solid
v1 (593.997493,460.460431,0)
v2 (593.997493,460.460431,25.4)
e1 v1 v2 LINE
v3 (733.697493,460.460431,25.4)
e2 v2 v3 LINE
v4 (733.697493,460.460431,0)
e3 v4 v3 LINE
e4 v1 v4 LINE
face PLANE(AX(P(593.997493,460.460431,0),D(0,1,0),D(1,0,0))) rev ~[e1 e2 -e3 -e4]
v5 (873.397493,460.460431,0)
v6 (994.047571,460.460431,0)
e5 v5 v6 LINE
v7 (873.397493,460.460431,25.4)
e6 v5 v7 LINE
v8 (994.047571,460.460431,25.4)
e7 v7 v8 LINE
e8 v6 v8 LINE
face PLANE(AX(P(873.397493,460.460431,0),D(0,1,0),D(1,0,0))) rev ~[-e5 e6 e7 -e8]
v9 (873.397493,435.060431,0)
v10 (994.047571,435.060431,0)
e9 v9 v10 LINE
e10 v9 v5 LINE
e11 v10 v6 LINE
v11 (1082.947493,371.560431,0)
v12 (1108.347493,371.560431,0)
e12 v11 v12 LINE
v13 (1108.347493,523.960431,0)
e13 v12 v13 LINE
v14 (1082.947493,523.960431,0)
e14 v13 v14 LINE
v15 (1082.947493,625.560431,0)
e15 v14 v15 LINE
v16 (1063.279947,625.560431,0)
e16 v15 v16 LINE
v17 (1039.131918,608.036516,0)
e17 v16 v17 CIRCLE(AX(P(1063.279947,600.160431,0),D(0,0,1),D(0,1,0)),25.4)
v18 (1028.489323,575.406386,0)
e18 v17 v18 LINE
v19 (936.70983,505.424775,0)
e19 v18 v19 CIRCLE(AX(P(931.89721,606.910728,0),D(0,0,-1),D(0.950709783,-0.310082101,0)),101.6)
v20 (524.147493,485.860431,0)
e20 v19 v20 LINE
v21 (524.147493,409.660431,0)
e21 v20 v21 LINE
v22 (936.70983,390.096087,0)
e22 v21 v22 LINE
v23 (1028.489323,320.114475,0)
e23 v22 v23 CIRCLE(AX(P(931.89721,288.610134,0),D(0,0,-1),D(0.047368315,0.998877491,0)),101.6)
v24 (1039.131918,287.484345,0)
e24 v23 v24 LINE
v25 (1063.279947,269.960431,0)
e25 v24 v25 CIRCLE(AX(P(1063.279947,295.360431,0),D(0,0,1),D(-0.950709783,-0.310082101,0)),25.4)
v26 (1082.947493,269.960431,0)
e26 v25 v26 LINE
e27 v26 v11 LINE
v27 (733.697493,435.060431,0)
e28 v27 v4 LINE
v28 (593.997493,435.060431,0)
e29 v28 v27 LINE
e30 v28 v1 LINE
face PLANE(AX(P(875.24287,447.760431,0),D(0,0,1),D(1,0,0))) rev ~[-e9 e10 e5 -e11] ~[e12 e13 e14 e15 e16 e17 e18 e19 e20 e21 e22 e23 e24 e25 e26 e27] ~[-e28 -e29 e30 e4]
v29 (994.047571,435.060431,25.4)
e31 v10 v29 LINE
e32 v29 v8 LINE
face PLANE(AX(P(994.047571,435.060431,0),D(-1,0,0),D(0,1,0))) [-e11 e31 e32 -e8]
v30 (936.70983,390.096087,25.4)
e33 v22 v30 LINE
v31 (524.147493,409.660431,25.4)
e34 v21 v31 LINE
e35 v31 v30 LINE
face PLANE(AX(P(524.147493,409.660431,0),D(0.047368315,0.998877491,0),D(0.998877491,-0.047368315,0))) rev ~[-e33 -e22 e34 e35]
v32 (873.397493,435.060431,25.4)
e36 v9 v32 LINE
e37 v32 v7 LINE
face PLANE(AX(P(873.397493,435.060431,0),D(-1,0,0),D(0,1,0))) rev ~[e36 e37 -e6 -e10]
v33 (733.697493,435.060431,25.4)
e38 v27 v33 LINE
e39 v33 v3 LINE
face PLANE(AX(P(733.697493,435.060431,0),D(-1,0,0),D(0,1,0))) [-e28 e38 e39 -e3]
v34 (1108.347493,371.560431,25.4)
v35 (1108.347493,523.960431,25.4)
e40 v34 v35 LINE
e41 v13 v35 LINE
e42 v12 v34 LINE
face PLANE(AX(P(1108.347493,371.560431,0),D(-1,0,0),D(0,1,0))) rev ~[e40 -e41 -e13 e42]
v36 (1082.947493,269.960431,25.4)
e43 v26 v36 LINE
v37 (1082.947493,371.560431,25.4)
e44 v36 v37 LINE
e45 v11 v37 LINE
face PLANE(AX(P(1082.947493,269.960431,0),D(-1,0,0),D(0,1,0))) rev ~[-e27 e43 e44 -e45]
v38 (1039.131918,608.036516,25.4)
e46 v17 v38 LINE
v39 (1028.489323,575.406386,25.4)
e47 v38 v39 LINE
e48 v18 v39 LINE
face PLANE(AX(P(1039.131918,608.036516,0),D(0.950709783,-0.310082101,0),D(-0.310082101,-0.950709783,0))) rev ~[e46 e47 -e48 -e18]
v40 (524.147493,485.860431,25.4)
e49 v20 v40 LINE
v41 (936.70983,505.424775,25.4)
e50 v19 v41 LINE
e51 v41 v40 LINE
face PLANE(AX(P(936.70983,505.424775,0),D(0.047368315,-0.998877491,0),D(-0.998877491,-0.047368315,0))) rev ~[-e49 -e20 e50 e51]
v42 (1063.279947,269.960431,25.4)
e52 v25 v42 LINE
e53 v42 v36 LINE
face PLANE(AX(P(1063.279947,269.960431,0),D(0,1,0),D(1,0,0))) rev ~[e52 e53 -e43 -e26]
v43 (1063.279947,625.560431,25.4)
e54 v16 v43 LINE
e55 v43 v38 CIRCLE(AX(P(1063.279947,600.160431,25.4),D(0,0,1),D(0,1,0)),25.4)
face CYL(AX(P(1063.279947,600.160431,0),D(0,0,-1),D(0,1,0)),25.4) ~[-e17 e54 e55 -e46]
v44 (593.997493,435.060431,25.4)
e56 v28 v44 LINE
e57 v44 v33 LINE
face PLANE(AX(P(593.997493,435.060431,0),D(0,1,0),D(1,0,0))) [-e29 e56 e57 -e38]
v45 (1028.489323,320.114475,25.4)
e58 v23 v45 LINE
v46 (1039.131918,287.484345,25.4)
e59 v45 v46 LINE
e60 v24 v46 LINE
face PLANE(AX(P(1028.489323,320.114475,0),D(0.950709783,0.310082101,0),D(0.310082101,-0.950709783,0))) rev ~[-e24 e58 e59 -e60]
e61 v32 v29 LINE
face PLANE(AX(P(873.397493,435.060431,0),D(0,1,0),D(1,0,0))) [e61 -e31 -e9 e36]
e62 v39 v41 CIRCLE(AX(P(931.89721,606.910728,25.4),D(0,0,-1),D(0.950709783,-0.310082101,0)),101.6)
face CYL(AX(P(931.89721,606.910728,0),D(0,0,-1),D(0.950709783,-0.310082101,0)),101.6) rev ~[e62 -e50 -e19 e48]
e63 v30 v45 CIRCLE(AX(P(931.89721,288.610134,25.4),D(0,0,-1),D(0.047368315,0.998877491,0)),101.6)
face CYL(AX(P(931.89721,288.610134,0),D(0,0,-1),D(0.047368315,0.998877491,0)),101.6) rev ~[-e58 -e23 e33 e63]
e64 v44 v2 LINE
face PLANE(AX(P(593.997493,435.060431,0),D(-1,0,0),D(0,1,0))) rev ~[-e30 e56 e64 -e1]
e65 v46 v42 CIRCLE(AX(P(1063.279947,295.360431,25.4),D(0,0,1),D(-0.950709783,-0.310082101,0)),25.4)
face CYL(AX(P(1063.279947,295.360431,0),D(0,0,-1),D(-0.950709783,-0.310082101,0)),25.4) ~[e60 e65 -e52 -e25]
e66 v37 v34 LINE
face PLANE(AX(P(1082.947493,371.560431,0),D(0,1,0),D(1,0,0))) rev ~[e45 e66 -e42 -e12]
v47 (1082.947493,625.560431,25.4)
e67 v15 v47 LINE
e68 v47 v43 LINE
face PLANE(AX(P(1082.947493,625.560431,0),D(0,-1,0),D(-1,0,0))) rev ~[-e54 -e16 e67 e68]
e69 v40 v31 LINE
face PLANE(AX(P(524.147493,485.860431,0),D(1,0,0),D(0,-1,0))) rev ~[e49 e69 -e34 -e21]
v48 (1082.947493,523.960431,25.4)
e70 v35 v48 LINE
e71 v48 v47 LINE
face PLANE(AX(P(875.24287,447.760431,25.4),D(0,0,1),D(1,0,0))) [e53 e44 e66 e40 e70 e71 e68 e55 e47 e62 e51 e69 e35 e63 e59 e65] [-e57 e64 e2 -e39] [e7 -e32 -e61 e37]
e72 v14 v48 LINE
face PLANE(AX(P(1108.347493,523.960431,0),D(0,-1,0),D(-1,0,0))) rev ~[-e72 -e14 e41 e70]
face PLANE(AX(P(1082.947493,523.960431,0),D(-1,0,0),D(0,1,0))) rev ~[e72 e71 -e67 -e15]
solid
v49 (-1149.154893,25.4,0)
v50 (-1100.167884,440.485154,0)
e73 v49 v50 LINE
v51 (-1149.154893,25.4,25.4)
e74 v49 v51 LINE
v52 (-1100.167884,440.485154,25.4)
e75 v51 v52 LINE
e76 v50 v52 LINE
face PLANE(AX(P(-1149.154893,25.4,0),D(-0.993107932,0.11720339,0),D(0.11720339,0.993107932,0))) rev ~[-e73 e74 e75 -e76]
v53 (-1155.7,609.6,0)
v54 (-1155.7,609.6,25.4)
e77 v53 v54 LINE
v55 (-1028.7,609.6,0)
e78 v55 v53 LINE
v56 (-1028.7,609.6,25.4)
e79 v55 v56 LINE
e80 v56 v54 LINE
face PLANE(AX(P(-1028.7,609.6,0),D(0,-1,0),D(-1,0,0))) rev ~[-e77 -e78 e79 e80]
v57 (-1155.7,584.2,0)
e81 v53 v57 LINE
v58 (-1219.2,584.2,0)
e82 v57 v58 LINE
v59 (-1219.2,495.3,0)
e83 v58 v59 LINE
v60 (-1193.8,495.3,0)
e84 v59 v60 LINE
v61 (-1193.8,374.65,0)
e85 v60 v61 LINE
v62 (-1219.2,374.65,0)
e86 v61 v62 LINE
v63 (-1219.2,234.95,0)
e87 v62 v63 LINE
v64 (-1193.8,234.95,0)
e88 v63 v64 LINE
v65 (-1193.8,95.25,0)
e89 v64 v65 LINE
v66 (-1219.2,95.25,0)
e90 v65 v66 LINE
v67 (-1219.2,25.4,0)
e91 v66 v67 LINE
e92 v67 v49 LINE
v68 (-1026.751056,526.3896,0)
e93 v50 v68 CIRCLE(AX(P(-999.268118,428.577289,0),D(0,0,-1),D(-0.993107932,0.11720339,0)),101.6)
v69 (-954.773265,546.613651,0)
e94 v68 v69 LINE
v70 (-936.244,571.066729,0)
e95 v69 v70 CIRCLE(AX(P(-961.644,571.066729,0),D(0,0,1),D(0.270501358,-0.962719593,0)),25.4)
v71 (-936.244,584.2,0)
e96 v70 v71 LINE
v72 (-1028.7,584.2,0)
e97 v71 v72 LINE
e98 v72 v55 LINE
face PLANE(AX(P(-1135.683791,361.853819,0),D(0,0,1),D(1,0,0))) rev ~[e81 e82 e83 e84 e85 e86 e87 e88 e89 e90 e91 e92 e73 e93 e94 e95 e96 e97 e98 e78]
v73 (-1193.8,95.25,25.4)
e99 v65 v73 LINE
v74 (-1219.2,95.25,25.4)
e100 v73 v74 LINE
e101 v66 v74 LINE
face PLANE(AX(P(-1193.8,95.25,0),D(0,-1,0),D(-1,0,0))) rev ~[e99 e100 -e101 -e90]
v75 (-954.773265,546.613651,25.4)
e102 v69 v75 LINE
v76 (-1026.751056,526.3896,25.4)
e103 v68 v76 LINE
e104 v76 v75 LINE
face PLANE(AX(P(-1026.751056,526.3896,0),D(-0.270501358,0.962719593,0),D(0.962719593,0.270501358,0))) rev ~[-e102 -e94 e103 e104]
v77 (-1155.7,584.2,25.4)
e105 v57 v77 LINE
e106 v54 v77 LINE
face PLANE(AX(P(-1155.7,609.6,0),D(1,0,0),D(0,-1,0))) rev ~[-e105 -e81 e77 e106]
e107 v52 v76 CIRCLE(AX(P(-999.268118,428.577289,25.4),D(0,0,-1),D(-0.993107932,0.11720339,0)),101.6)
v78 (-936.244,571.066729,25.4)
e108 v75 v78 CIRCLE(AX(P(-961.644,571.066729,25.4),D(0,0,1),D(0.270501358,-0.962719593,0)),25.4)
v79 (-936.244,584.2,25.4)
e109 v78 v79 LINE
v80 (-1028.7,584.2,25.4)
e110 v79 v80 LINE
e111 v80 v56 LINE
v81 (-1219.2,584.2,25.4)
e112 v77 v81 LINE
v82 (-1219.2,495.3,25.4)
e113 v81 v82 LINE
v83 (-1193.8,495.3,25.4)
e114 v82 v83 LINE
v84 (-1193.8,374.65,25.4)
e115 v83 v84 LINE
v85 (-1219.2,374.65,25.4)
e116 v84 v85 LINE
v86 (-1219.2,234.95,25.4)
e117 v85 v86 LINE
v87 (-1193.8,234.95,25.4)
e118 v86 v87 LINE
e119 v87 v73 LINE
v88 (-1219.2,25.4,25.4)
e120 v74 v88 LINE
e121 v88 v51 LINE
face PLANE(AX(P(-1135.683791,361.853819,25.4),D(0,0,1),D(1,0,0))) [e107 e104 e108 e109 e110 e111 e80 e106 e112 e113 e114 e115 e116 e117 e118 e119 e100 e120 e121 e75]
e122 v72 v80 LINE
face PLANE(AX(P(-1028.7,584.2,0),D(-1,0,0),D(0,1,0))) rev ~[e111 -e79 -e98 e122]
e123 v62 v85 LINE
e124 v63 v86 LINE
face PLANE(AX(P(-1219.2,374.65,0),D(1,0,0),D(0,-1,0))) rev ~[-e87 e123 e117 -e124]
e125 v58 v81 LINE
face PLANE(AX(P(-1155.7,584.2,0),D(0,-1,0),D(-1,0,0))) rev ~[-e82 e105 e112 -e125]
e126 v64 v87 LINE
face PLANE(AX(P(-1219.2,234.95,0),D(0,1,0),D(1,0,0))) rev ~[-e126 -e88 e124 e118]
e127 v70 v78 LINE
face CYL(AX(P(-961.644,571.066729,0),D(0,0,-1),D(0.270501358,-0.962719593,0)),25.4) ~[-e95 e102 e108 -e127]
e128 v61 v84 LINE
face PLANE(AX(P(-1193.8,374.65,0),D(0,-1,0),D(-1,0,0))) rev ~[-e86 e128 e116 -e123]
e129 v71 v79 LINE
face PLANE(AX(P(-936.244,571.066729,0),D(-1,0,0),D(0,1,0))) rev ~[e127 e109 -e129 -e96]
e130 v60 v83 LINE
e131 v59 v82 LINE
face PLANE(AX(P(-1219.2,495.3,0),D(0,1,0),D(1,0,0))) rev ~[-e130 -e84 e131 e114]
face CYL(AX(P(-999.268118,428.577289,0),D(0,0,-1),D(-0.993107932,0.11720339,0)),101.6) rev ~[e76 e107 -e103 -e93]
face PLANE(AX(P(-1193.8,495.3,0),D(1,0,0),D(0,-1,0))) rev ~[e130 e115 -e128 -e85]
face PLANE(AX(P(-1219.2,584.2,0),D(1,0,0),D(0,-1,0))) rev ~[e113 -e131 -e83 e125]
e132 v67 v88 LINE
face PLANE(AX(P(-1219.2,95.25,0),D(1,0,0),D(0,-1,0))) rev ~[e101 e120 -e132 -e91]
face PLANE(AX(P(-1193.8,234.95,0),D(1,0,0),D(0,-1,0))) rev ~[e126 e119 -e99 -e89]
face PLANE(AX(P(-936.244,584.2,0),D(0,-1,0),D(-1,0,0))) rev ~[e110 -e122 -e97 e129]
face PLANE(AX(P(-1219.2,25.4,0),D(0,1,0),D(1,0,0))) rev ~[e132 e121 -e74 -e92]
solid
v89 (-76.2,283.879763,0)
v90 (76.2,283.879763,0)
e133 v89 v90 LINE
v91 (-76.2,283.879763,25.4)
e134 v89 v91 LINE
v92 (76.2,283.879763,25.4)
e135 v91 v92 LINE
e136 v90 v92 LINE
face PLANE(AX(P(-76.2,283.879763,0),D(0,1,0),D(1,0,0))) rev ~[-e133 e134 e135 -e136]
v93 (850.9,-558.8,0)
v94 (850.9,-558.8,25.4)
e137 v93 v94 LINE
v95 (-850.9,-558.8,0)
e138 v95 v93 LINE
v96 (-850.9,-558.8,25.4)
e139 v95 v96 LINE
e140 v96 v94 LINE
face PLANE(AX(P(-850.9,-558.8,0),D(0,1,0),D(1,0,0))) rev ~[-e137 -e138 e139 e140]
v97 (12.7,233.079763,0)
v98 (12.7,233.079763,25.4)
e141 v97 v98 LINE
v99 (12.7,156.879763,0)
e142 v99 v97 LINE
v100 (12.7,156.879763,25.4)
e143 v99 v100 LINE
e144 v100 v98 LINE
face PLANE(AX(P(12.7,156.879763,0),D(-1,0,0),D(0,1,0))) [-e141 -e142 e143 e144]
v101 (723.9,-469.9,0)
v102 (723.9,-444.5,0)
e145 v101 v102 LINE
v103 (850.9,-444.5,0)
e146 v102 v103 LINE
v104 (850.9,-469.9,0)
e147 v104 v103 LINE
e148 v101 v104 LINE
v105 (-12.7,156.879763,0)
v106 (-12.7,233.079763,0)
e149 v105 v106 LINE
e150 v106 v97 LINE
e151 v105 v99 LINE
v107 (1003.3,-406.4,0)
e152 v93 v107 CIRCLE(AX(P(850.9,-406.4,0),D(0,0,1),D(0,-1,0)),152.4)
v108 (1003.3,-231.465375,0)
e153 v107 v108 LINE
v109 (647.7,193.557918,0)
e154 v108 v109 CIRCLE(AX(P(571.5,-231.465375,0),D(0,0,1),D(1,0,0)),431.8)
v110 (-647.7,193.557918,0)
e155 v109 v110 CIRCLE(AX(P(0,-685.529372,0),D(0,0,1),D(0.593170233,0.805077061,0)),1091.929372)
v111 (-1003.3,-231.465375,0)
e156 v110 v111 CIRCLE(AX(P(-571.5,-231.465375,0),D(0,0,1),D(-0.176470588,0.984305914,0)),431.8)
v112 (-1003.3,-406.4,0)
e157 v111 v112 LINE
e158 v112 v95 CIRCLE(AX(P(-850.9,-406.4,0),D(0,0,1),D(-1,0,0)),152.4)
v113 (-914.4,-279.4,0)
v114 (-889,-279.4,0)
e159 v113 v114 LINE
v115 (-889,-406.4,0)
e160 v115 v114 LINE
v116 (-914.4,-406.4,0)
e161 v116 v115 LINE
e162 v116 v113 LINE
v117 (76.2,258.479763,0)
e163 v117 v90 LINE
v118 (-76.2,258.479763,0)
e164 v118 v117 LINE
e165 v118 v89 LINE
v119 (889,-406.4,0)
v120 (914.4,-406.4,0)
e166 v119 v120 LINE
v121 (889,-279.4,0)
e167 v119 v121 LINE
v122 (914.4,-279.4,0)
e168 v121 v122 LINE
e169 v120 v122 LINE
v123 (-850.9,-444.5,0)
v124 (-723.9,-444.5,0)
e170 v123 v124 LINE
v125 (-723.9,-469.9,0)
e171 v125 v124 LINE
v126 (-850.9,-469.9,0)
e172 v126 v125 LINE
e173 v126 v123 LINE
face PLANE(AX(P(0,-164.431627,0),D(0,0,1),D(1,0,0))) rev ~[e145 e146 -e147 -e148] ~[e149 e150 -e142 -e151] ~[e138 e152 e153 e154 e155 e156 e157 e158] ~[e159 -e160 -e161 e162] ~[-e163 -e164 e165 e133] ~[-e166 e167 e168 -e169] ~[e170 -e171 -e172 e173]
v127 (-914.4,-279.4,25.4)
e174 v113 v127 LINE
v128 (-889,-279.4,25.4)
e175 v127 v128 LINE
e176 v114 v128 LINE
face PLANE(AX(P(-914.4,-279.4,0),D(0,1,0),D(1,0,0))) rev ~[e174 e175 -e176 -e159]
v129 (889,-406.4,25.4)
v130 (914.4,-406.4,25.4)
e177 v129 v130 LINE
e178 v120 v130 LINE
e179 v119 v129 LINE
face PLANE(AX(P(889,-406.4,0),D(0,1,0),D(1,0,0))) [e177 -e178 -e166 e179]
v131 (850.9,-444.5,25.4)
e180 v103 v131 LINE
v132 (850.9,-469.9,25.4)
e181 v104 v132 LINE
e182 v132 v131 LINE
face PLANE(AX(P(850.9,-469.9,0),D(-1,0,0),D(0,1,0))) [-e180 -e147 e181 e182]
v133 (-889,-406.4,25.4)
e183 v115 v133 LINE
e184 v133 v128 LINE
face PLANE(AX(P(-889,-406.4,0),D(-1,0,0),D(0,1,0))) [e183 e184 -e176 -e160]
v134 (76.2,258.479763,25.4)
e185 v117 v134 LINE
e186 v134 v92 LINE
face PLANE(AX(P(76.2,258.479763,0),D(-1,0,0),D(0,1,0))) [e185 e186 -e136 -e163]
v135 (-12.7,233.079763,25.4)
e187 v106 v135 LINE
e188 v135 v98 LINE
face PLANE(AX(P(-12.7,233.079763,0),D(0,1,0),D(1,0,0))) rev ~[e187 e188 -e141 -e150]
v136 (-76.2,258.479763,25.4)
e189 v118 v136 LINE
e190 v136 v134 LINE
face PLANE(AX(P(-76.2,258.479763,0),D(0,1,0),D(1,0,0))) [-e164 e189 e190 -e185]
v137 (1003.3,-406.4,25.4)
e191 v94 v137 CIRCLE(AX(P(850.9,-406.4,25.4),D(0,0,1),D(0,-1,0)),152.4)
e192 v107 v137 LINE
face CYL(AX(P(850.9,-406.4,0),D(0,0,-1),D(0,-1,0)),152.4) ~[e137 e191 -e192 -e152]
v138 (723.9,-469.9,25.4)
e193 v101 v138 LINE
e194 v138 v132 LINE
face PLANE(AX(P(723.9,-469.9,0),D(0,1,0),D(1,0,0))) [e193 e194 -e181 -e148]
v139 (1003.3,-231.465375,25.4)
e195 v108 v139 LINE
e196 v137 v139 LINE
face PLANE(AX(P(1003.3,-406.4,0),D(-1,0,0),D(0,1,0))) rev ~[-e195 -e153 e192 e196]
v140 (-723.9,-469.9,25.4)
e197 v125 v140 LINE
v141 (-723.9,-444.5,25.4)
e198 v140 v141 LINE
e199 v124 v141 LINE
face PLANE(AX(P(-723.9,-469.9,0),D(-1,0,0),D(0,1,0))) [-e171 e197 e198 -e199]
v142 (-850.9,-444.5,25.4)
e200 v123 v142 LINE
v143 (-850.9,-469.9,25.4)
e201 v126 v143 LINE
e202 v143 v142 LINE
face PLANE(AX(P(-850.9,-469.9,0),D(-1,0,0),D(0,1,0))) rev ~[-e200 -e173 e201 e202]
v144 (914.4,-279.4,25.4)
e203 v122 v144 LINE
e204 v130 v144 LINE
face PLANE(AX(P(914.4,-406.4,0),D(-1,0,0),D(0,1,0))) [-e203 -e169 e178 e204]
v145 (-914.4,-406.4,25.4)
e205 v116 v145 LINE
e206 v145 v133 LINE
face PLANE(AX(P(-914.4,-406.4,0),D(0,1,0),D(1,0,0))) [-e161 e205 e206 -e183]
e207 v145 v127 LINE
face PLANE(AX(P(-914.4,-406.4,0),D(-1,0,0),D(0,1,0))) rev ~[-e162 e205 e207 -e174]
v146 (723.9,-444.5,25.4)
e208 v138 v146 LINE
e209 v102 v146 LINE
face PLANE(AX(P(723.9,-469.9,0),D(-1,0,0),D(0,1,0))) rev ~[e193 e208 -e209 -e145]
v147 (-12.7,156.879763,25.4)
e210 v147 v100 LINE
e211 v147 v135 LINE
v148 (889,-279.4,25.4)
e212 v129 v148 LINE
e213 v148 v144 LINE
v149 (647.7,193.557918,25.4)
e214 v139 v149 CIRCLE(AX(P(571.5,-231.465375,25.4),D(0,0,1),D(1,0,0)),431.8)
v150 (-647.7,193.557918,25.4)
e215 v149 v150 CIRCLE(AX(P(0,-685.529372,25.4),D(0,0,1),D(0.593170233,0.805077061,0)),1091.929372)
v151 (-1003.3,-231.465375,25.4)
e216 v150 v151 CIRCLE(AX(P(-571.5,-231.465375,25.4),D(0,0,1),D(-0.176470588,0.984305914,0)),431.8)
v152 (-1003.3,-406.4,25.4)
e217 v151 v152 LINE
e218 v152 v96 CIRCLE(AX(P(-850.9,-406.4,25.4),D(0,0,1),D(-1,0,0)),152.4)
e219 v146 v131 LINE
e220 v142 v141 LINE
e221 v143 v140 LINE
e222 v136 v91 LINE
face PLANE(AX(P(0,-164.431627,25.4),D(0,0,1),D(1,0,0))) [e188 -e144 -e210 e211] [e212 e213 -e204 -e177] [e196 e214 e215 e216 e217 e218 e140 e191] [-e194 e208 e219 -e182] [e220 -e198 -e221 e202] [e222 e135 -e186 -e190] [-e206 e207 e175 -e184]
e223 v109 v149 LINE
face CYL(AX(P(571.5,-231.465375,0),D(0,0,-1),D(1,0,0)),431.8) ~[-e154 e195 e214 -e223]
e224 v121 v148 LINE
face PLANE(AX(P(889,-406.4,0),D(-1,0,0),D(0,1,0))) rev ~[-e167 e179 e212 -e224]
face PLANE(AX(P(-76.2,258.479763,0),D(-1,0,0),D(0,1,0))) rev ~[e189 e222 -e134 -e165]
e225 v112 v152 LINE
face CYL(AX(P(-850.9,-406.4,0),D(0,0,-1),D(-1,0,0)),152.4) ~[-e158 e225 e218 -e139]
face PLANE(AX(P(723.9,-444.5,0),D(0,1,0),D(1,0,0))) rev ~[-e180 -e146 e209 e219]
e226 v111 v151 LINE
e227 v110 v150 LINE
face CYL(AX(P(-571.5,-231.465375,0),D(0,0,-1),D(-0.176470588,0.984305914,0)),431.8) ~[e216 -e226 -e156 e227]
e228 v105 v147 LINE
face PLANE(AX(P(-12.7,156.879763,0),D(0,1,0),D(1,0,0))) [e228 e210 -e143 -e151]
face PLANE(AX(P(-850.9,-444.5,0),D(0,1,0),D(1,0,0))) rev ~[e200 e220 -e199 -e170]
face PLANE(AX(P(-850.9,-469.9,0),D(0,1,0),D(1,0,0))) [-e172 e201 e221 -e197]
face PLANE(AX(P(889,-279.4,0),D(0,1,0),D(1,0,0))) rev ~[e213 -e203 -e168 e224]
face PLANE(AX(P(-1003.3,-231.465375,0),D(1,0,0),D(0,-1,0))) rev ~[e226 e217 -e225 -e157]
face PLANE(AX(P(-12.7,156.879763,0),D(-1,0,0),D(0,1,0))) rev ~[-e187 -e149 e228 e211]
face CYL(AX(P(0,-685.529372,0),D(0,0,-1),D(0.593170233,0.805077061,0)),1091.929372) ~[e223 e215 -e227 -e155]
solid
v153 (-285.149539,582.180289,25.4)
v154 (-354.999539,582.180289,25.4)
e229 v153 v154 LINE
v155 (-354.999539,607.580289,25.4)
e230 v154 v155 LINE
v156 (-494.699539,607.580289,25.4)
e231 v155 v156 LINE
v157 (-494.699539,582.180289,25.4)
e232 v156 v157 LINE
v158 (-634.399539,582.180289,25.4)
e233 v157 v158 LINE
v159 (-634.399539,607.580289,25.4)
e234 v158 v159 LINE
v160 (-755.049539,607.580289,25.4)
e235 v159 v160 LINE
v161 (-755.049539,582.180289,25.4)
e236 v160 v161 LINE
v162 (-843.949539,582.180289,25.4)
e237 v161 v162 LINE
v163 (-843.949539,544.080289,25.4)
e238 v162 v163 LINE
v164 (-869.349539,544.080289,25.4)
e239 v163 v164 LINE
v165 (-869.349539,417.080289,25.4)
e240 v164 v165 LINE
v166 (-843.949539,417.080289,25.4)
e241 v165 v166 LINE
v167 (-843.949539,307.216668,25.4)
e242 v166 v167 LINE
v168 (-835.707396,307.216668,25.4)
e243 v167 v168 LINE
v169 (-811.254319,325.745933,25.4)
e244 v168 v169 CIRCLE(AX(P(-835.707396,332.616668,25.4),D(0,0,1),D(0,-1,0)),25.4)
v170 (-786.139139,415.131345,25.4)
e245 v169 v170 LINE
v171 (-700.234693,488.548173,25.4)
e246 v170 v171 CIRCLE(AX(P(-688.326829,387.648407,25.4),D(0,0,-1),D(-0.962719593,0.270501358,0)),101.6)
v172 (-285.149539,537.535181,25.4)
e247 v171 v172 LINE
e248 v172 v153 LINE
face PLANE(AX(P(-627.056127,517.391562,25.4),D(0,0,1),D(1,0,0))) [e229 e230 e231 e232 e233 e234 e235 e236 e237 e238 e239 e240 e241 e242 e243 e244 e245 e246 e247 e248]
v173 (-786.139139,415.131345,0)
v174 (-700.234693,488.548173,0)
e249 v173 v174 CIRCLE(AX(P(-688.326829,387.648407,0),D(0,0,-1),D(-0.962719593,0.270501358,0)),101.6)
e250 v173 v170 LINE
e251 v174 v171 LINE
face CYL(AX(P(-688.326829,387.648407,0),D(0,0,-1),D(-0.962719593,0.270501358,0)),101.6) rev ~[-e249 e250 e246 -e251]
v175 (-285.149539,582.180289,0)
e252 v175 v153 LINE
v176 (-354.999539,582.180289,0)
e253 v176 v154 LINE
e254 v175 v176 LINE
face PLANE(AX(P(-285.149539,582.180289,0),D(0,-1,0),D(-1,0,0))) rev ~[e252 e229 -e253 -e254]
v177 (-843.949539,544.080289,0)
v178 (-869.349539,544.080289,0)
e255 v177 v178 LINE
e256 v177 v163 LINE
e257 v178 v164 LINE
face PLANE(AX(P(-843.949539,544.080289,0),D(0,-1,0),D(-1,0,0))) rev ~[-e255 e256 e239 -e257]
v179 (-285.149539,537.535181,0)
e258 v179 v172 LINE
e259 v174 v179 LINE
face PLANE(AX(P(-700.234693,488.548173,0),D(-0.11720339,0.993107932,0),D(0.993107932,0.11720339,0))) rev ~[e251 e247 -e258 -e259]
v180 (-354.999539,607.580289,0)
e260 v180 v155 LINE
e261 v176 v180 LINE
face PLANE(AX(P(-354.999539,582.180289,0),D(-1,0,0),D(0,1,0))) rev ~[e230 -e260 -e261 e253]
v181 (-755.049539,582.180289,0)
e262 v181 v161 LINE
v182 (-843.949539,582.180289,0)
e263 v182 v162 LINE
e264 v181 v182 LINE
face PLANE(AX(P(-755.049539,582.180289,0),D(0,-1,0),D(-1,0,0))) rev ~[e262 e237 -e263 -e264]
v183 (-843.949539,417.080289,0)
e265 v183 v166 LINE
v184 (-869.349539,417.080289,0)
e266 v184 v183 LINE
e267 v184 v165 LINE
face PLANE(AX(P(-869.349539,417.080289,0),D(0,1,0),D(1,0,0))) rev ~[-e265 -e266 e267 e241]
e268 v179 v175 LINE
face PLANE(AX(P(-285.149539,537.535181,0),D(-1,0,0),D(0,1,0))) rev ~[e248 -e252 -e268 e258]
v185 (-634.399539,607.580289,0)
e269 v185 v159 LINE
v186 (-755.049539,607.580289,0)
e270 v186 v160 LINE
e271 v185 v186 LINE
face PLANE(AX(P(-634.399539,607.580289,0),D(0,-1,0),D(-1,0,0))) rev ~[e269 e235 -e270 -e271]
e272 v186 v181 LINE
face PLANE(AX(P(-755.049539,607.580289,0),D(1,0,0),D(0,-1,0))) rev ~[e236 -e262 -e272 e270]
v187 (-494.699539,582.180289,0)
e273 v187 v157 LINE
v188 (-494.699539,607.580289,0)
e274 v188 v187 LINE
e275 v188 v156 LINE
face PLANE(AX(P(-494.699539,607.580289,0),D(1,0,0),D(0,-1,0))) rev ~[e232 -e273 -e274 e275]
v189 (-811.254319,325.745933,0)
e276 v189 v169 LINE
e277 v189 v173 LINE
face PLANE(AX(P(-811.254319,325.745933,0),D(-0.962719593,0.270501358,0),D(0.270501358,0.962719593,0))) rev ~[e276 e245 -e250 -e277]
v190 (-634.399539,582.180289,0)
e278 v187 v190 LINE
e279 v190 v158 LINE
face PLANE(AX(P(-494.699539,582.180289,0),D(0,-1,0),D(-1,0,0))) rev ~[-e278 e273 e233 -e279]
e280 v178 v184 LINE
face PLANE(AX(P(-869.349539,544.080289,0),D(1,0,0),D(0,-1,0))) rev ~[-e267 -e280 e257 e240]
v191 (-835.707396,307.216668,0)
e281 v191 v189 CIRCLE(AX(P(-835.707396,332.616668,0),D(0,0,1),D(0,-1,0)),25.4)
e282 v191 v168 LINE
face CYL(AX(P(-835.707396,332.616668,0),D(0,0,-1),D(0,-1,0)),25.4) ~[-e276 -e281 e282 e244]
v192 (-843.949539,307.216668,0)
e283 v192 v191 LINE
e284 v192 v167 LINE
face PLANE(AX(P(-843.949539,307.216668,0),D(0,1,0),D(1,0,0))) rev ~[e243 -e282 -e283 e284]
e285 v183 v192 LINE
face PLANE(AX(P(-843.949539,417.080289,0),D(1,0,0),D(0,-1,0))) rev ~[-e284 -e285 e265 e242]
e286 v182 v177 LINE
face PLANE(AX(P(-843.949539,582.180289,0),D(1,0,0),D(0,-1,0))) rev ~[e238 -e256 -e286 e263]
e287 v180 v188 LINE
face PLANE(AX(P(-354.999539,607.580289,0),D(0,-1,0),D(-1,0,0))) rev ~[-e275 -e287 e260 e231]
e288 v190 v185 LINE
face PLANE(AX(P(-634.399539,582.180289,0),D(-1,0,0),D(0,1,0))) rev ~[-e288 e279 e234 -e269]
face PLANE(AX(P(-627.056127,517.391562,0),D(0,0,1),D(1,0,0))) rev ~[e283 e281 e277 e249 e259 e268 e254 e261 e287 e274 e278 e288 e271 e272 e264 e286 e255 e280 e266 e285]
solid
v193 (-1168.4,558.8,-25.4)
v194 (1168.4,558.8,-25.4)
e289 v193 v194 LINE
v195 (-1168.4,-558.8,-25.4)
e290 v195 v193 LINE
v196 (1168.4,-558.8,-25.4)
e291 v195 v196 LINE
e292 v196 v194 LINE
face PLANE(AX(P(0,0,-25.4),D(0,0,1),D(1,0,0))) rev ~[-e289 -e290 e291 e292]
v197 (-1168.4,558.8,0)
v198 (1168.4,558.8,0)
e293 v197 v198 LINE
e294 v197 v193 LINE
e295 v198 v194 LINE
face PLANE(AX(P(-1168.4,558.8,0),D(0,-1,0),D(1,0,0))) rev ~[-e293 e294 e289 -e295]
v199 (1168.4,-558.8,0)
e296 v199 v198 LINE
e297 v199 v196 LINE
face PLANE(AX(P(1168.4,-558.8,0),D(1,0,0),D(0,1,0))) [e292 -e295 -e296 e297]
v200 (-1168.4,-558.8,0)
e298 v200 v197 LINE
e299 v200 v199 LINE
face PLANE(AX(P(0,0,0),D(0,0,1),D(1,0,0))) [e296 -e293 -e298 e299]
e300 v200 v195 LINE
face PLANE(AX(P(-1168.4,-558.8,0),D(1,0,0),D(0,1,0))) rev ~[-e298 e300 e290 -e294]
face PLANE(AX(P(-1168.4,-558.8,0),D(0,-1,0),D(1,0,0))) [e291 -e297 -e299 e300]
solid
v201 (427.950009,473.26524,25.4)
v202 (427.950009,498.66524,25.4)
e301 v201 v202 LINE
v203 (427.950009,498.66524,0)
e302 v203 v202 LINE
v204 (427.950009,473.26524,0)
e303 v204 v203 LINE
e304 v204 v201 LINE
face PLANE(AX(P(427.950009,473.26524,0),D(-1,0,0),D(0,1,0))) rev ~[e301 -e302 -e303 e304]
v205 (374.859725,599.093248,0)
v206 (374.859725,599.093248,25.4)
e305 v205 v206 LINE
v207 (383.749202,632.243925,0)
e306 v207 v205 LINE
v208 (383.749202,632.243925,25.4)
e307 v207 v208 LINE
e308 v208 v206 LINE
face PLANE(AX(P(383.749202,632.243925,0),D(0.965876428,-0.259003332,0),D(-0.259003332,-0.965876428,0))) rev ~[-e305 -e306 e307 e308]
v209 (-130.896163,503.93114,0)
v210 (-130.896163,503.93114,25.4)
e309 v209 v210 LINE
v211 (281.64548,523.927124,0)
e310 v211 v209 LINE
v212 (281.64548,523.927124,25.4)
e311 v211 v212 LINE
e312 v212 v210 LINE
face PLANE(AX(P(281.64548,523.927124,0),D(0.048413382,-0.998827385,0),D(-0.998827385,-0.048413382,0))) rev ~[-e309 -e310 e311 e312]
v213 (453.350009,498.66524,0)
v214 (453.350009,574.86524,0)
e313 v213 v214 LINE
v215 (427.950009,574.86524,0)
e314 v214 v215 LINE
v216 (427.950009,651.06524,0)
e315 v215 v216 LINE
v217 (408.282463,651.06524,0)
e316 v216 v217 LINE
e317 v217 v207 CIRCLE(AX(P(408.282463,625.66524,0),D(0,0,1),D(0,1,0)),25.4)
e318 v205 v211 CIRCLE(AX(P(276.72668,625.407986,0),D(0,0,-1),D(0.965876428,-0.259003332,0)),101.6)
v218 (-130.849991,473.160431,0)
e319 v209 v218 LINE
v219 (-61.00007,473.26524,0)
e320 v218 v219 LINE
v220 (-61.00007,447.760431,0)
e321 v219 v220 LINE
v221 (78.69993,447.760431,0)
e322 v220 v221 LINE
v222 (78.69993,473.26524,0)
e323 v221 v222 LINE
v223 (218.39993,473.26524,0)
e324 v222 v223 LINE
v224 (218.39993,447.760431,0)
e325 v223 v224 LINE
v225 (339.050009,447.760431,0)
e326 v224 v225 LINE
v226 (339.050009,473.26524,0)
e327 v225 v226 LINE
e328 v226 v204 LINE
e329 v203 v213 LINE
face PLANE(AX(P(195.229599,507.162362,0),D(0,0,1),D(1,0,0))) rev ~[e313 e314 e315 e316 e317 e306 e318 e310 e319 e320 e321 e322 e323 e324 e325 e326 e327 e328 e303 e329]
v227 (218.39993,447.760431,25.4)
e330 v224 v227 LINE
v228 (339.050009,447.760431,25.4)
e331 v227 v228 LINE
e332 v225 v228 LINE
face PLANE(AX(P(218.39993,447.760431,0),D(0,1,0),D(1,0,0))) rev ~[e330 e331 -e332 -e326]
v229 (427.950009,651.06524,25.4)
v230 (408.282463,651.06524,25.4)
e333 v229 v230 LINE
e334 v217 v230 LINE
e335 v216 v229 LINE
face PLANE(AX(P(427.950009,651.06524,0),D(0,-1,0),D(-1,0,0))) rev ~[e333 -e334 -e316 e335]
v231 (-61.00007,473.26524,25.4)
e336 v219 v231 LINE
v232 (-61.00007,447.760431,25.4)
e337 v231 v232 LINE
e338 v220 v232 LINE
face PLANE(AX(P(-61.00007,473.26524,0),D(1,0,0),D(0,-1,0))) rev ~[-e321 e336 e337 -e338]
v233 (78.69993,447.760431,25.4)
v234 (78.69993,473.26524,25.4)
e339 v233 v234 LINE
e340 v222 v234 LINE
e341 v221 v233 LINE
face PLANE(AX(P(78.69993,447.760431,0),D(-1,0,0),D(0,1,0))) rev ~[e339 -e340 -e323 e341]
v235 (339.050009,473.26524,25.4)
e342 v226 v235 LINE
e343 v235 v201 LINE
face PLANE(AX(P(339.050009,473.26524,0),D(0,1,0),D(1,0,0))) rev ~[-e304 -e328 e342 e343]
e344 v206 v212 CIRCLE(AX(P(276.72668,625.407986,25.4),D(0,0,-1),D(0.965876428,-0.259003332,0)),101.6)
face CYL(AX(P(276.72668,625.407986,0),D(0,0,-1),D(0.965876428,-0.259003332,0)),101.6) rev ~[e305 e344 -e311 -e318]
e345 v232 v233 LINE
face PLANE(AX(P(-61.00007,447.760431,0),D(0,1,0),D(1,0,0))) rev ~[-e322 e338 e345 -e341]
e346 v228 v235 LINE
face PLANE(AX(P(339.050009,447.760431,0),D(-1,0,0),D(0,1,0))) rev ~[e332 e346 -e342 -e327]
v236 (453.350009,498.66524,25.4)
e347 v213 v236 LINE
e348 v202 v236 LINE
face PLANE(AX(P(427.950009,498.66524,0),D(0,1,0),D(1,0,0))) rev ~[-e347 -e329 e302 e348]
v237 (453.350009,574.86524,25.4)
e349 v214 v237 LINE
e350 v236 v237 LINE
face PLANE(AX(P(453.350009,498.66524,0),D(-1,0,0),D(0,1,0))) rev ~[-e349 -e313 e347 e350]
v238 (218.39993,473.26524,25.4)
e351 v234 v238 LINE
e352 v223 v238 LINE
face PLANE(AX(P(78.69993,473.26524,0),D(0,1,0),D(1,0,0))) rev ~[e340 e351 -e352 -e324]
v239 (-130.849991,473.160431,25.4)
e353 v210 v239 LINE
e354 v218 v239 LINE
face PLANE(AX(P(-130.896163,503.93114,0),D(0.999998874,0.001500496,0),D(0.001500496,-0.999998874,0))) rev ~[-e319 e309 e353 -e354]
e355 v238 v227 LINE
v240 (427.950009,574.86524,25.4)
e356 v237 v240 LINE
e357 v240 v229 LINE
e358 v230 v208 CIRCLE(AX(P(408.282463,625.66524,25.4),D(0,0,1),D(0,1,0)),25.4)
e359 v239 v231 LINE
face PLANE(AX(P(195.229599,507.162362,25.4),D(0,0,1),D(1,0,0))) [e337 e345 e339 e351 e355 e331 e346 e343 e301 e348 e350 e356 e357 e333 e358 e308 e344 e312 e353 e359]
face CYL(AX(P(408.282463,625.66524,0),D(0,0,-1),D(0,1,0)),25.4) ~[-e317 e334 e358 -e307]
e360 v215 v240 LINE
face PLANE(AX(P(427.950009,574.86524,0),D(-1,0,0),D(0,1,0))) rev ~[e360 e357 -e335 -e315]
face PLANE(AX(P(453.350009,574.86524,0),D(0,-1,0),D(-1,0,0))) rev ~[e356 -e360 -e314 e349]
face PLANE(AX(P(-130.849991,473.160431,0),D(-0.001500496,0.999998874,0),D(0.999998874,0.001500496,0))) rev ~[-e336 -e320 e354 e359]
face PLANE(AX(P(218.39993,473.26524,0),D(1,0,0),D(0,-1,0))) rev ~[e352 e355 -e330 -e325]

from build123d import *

# Parameters (mm, degrees)
F1_W     = 127
F1_H     = 25.4
F1_W_2   = 25.4
F1_H_2   = 127
F1_H_3   = 76.2
F1_W_3   = 152.4
F2_DEPTH = 25.4
F1_W_4   = 139.7
F1_W_5   = 120.6500786332
F3_W     = 2336.8
F3_H     = 1117.6
F4_DEPTH = 25.4


# Not quite as in the source:
# - a variable given as a bare number and used for a length is read in inches; the dataset says mm whatever the document's units were


with BuildPart() as f2:
    # F1 (on Top) → F2 (new body)
    with BuildSketch(Plane.XY):
        with BuildLine():
            ThreePointArc((647.7, 193.5579180717), (0, 406.4), (-647.7, 193.5579180717))
            ThreePointArc((-647.7, 193.5579180717), (-902.6754821843, 45.6159123042), (-1003.3, -231.4653754076))
            Line((-1003.3, -231.4653754076), (-1003.3, -406.4))
            ThreePointArc((-1003.3, -406.4), (-958.6630734528, -514.1630734528), (-850.9, -558.8))
            Line((-850.9, -558.8), (850.9, -558.8))
            ThreePointArc((850.9, -558.8), (958.6630734528, -514.1630734528), (1003.3, -406.4))
            Line((1003.3, -406.4), (1003.3, -231.4653754076))
            ThreePointArc((1003.3, -231.4653754076), (902.6754821843, 45.6159123042), (647.7, 193.5579180717))
        make_face()
        with Locations((-787.4, -457.2)):
            Rectangle(F1_W, F1_H, mode=Mode.SUBTRACT)
        with Locations((-901.7, -342.9)):
            Rectangle(F1_W_2, F1_H_2, mode=Mode.SUBTRACT)
        with Locations((787.4, -457.2)):
            Rectangle(F1_W, F1_H, mode=Mode.SUBTRACT)
        with Locations((901.7, -342.9)):
            Rectangle(F1_W_2, F1_H_2, mode=Mode.SUBTRACT)
        with Locations((0, 194.9797632933)):
            Rectangle(F1_W_2, F1_H_3, mode=Mode.SUBTRACT)
        with Locations((0, 271.1797632933)):
            Rectangle(F1_W_3, F1_H, mode=Mode.SUBTRACT)
    extrude(amount=F2_DEPTH)


with BuildPart() as f2b:
    # F1 (on Top) → F2, piece 2 (new body)
    with BuildSketch(Plane.XY):
        with BuildLine():
            Line((-1155.7, 584.2), (-1219.2, 584.2))
            Line((-1219.2, 584.2), (-1219.2, 495.3))
            Line((-1219.2, 495.3), (-1193.8, 495.3))
            Line((-1193.8, 495.3), (-1193.8, 374.65))
            Line((-1193.8, 374.65), (-1219.2, 374.65))
            Line((-1219.2, 374.65), (-1219.2, 234.95))
            Line((-1219.2, 234.95), (-1193.8, 234.95))
            Line((-1193.8, 234.95), (-1193.8, 95.25))
            Line((-1193.8, 95.25), (-1219.2, 95.25))
            Line((-1219.2, 95.25), (-1219.2, 25.4))
            Line((-1219.2, 25.4), (-1149.1548928144, 25.4))
            Line((-1149.1548928144, 25.4), (-1100.1678840305, 440.4851537224))
            ThreePointArc((-1100.1678840305, 440.4851537224), (-1076.504269872, 494.5859013387), (-1026.751056115, 526.3896))
            Line((-1026.751056115, 526.3896), (-954.7732654951, 546.6136509902))
            ThreePointArc((-954.7732654951, 546.6136509902), (-941.3995358626, 555.7265307509), (-936.244, 571.0667286567))
            Line((-936.244, 571.0667286567), (-936.244, 584.2))
            Line((-936.244, 584.2), (-1028.7, 584.2))
            Line((-1028.7, 584.2), (-1028.7, 609.6))
            Line((-1028.7, 609.6), (-1155.7, 609.6))
            Line((-1155.7, 609.6), (-1155.7, 584.2))
        make_face()
    extrude(amount=F2_DEPTH)


with BuildPart() as f2c:
    # F1 (on Top) → F2, piece 3 (new body)
    with BuildSketch(Plane.XY):
        with BuildLine():
            Line((-843.9495392799, 307.2166677045), (-835.7073963069, 307.2166677045))
            ThreePointArc((-835.7073963069, 307.2166677045), (-820.3671984011, 312.3722035671), (-811.2543186404, 325.7459331997))
            Line((-811.2543186404, 325.7459331997), (-786.1391392799, 415.1313447704))
            ThreePointArc((-786.1391392799, 415.1313447704), (-754.3354406186, 464.8845585274), (-700.2346930023, 488.5481726859))
            Line((-700.2346930023, 488.5481726859), (-285.1495392799, 537.5351814698))
            Line((-285.1495392799, 537.5351814698), (-285.1495392799, 582.1802886554))
            Line((-285.1495392799, 582.1802886554), (-354.9995392799, 582.1802886554))
            Line((-354.9995392799, 582.1802886554), (-354.9995392799, 607.5802886554))
            Line((-354.9995392799, 607.5802886554), (-494.6995392799, 607.5802886554))
            Line((-494.6995392799, 607.5802886554), (-494.6995392799, 582.1802886554))
            Line((-494.6995392799, 582.1802886554), (-634.3995392799, 582.1802886554))
            Line((-634.3995392799, 582.1802886554), (-634.3995392799, 607.5802886554))
            Line((-634.3995392799, 607.5802886554), (-755.0495392799, 607.5802886554))
            Line((-755.0495392799, 607.5802886554), (-755.0495392799, 582.1802886554))
            Line((-755.0495392799, 582.1802886554), (-843.9495392799, 582.1802886554))
            Line((-843.9495392799, 582.1802886554), (-843.9495392799, 544.0802886554))
            Line((-843.9495392799, 544.0802886554), (-869.3495392799, 544.0802886554))
            Line((-869.3495392799, 544.0802886554), (-869.3495392799, 417.0802886554))
            Line((-869.3495392799, 417.0802886554), (-843.9495392799, 417.0802886554))
            Line((-843.9495392799, 417.0802886554), (-843.9495392799, 307.2166677045))
        make_face()
    extrude(amount=F2_DEPTH)


with BuildPart() as f2d:
    # F1 (on Top) → F2, piece 4 (new body)
    with BuildSketch(Plane.XY):
        with BuildLine():
            Line((524.1474925995, 485.8604307627), (524.1474925995, 447.7604307627))
            Line((524.1474925995, 447.7604307627), (524.1474925995, 409.6604307627))
            Line((524.1474925995, 409.6604307627), (936.7098303317, 390.0960868362))
            ThreePointArc((936.7098303317, 390.0960868362), (993.5014833177, 369.4029146453), (1028.4893234405, 320.1144751514))
            Line((1028.4893234405, 320.1144751514), (1039.1319184416, 287.4843454036))
            ThreePointArc((1039.1319184416, 287.4843454036), (1048.3617125766, 274.8030407518), (1063.2799469204, 269.9604307627))
            Line((1063.2799469204, 269.9604307627), (1082.9474925995, 269.9604307627))
            Line((1082.9474925995, 269.9604307627), (1082.9474925995, 371.5604307627))
            Line((1082.9474925995, 371.5604307627), (1108.3474925995, 371.5604307627))
            Line((1108.3474925995, 371.5604307627), (1108.3474925995, 447.7604307627))
            Line((1108.3474925995, 447.7604307627), (1108.3474925995, 523.9604307627))
            Line((1108.3474925995, 523.9604307627), (1082.9474925995, 523.9604307627))
            Line((1082.9474925995, 523.9604307627), (1082.9474925995, 625.5604307627))
            Line((1082.9474925995, 625.5604307627), (1063.2799469204, 625.5604307627))
            ThreePointArc((1063.2799469204, 625.5604307627), (1048.3617125766, 620.7178207737), (1039.1319184416, 608.0365161219))
            Line((1039.1319184416, 608.0365161219), (1028.4893234405, 575.4063863741))
            ThreePointArc((1028.4893234405, 575.4063863741), (993.5014833177, 526.1179468802), (936.7098303317, 505.4247746893))
            Line((936.7098303317, 505.4247746893), (524.1474925995, 485.8604307627))
        make_face()
        with Locations((663.8474925995, 447.7604307627)):
            Rectangle(F1_W_4, F1_H, mode=Mode.SUBTRACT)
        with Locations((933.7225319161, 447.7604307627)):
            Rectangle(F1_W_5, F1_H, mode=Mode.SUBTRACT)
    extrude(amount=F2_DEPTH)


with BuildPart() as f2e:
    # F1 (on Top) → F2, piece 5 (new body)
    with BuildSketch(Plane.XY):
        with BuildLine():
            ThreePointArc((374.8597252388, 599.0932477678), (340.5029078126, 546.3184624133), (281.6454797612, 523.9271239977))
            Line((281.6454797612, 523.9271239977), (-130.8961626275, 503.931140311))
            Line((-130.8961626275, 503.931140311), (-130.8499912567, 473.1604307627))
            Line((-130.8499912567, 473.1604307628), (-61.0000698899, 473.2652403909))
            Line((-61.0000698899, 473.2652403909), (-61.0000698899, 447.7604307627))
            Line((-61.0000698899, 447.7604307627), (78.6999301101, 447.7604307627))
            Line((78.6999301101, 447.7604307627), (78.6999301101, 473.2652403909))
            Line((78.6999301101, 473.2652403909), (218.3999301101, 473.2652403909))
            Line((218.3999301101, 473.2652403909), (218.3999301101, 447.7604307627))
            Line((218.3999301101, 447.7604307627), (339.0500087433, 447.7604307627))
            Line((339.0500087433, 447.7604307627), (339.0500087433, 473.2652403909))
            Line((339.0500087433, 473.2652403909), (427.9500087433, 473.2652403909))
            Line((427.9500087433, 473.2652403909), (427.9500087433, 498.6652403909))
            Line((427.9500087433, 498.6652403909), (453.3500087433, 498.6652403909))
            Line((453.3500087433, 498.6652403909), (453.3500087433, 574.8652403909))
            Line((453.3500087433, 574.8652403909), (427.9500087433, 574.8652403909))
            Line((427.9500087433, 574.8652403909), (427.9500087433, 651.0652403909))
            Line((427.9500087433, 651.0652403909), (408.2824630643, 651.0652403909))
            ThreePointArc((408.2824630643, 651.0652403909), (392.821845185, 645.8178902115), (383.7492017941, 632.2439250201))
            Line((383.7492017941, 632.2439250201), (374.8597252388, 599.0932477678))
        make_face()
    extrude(amount=F2_DEPTH)


with BuildPart() as f4:
    # F3 (on face) → F4 (new body)
    with BuildSketch(Plane.XY):
        Rectangle(F3_W, F3_H)
    extrude(amount=-F4_DEPTH)


solid = Compound([f2.part, f2b.part, f2c.part, f2d.part, f2e.part, f4.part])
